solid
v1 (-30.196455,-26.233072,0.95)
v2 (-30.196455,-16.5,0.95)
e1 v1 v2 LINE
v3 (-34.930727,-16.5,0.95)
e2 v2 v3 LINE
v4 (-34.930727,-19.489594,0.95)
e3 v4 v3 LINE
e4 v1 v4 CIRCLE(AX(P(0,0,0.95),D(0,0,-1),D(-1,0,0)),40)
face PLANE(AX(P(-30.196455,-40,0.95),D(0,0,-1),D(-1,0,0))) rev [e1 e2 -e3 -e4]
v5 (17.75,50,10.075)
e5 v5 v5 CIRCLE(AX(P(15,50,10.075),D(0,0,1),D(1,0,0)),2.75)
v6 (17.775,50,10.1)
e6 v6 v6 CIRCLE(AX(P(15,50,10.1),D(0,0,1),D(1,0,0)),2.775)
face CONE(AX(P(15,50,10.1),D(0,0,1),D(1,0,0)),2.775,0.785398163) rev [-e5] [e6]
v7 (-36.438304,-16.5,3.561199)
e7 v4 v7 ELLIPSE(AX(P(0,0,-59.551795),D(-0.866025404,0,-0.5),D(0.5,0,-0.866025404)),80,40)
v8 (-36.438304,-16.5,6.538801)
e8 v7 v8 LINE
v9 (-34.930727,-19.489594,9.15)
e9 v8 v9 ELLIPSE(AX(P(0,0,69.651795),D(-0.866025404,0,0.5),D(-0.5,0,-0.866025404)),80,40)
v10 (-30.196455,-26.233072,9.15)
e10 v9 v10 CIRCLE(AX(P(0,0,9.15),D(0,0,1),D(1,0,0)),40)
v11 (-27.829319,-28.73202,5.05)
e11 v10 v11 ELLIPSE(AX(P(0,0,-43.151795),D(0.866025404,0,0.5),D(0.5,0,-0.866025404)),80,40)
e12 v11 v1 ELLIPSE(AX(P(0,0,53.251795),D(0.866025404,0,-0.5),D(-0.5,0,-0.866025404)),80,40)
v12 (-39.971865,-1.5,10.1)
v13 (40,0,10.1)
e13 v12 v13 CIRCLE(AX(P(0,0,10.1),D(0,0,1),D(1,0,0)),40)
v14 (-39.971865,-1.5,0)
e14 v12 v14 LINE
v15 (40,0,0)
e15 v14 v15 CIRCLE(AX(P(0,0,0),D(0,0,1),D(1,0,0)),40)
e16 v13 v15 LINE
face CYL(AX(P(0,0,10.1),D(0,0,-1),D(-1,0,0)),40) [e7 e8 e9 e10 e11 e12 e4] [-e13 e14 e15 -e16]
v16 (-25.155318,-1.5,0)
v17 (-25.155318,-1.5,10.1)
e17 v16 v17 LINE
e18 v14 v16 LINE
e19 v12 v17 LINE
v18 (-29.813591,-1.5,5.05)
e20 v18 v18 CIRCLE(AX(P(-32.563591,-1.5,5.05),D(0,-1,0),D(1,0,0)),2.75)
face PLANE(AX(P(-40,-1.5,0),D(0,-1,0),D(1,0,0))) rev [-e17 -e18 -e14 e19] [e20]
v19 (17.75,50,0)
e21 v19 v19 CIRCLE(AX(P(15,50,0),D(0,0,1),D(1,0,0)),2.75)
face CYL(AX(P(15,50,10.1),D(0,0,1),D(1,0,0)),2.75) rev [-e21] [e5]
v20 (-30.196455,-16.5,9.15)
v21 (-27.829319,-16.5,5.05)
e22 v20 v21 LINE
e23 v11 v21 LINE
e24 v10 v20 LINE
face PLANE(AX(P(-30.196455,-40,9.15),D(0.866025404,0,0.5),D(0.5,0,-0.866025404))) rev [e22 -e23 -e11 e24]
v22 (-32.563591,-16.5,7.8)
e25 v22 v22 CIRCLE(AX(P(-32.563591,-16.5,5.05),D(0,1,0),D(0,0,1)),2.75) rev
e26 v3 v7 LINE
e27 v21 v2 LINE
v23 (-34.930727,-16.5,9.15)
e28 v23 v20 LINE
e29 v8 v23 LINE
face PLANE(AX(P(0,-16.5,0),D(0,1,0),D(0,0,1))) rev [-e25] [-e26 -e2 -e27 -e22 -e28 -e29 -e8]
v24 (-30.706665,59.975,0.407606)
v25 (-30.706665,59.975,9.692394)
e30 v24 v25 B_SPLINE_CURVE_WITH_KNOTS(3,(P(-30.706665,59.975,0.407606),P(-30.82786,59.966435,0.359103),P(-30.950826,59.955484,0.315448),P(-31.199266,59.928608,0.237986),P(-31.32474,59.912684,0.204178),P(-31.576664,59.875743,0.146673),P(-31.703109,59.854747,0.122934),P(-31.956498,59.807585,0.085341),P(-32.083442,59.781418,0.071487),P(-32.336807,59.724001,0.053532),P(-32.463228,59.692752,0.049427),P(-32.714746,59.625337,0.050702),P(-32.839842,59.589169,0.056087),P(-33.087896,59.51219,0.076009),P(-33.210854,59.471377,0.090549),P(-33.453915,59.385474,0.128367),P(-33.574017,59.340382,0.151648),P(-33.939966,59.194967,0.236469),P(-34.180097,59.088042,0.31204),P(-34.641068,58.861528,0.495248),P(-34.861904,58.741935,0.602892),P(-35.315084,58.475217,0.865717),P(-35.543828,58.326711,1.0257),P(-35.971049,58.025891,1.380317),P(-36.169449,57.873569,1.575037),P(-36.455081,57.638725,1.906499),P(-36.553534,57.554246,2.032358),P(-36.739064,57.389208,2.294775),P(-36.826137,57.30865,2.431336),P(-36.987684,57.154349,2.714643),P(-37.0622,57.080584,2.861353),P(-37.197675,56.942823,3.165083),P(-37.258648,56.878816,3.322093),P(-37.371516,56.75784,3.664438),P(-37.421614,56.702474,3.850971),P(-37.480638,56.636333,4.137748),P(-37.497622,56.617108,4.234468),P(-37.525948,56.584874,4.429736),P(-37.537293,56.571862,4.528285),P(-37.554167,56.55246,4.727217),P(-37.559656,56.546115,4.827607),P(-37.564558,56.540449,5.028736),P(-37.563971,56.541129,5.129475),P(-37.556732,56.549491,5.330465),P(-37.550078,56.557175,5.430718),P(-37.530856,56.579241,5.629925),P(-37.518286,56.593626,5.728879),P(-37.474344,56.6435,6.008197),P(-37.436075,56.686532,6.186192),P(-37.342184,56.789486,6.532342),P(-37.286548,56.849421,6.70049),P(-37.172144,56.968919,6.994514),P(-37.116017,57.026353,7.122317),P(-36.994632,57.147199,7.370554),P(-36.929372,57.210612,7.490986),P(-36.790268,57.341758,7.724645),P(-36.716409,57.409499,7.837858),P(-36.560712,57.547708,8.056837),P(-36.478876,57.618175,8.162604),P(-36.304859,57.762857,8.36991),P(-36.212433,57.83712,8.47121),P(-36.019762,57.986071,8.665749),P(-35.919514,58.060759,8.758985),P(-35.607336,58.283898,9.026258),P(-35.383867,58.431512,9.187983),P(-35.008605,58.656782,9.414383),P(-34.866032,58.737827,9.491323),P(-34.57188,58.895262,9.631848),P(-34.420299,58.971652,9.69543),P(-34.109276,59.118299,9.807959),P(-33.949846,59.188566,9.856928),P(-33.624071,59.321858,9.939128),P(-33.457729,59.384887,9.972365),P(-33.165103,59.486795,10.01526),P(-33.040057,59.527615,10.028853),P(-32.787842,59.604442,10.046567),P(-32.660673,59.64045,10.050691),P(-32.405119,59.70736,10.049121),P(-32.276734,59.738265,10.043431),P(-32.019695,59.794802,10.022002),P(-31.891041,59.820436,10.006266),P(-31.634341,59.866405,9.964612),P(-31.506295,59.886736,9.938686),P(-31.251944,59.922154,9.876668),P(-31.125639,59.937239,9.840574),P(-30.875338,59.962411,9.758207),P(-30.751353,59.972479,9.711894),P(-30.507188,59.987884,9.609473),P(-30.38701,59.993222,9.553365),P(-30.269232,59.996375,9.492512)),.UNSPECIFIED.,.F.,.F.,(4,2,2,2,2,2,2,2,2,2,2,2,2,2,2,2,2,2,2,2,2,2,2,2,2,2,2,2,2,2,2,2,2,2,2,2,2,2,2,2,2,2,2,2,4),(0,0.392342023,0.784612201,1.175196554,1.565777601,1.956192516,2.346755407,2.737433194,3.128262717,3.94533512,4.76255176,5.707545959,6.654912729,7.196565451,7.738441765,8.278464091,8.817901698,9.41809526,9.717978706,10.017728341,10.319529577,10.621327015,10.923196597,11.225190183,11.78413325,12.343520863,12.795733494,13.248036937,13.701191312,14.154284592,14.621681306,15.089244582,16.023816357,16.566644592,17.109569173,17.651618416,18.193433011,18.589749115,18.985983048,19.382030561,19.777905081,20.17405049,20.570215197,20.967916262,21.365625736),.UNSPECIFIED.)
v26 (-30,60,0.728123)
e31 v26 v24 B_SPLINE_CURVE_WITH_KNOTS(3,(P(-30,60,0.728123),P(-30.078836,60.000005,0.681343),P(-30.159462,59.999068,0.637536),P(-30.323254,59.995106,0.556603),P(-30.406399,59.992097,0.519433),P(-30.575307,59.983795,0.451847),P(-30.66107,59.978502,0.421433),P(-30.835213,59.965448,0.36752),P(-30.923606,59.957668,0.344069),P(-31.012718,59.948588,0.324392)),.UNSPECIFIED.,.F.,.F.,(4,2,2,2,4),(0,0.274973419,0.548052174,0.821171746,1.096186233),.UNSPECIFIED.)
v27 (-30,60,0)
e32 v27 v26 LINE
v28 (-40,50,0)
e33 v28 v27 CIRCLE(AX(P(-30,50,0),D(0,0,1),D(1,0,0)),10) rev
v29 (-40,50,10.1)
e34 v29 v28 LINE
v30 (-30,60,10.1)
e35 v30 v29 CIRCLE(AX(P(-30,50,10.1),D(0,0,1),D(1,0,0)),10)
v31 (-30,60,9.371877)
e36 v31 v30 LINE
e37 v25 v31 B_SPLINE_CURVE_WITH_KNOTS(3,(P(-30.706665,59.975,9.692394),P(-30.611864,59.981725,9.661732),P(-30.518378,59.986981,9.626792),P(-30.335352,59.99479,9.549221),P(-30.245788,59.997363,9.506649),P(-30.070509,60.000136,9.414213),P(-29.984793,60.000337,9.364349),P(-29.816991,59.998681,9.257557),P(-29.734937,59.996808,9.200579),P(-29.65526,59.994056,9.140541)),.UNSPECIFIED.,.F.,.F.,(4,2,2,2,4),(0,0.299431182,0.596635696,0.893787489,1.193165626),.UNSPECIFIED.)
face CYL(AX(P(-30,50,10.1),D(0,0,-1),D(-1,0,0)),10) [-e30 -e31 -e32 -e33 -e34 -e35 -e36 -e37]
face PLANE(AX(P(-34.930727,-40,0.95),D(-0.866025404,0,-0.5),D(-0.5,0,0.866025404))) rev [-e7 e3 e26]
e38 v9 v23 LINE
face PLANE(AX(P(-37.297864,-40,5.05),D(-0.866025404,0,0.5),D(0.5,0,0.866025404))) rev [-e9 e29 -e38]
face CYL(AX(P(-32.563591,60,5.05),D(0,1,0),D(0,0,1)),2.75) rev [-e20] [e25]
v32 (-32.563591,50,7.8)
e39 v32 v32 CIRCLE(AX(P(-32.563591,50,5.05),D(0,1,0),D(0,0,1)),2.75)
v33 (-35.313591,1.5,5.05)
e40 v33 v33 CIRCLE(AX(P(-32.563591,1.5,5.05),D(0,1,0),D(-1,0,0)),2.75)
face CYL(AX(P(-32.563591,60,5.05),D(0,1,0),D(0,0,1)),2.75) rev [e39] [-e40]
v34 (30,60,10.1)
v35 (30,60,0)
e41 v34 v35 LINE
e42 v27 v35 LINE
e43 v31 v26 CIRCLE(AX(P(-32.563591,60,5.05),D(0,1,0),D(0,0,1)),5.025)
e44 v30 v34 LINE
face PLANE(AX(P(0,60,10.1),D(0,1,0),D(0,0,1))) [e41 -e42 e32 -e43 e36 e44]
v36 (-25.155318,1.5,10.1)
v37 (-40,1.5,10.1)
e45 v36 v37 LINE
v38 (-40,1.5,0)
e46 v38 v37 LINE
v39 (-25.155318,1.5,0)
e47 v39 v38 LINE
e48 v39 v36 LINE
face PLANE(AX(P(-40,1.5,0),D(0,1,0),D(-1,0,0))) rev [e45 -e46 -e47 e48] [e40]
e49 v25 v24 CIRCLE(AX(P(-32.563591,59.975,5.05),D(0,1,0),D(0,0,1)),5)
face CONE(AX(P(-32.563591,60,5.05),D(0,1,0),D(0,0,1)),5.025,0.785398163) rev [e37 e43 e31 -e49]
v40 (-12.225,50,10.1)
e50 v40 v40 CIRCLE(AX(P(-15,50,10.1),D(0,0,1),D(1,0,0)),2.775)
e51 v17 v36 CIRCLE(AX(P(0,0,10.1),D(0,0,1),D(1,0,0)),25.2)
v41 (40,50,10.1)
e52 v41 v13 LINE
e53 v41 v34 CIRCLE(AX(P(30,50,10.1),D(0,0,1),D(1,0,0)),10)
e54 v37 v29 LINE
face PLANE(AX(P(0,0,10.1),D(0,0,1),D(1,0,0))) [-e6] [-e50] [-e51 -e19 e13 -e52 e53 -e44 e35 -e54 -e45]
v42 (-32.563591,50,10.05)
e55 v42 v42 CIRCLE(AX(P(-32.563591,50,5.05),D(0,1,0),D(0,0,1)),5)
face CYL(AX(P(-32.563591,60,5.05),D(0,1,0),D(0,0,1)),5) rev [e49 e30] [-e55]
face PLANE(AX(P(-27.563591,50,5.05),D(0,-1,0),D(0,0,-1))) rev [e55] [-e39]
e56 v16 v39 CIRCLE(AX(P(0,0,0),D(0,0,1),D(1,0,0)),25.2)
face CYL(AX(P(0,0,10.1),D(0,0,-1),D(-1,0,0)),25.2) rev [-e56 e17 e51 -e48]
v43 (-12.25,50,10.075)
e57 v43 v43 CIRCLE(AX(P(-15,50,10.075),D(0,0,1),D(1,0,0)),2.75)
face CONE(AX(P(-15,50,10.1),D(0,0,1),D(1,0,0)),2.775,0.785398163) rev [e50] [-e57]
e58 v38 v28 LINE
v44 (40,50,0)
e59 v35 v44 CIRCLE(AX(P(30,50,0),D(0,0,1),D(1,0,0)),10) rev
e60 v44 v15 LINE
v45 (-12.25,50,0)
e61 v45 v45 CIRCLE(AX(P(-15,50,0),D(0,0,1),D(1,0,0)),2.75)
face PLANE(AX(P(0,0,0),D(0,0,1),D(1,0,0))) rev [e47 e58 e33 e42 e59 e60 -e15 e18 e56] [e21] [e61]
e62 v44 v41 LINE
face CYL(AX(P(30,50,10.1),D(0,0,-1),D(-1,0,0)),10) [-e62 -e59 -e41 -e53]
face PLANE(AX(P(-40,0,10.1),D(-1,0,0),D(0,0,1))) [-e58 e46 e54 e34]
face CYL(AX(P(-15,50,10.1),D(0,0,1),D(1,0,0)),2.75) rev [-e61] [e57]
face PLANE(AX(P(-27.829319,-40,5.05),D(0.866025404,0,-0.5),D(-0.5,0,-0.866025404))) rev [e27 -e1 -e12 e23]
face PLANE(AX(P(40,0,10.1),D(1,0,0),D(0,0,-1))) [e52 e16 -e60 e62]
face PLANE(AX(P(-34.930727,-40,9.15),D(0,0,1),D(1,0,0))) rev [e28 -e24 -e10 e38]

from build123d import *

# Parameters (mm, degrees)
BOSS_EXTRUDE1_DEPTH            = 10.1
SKETCH3_W                      = 14.844682471
SKETCH3_H                      = 3
CUT_EXTRUDE1_DEPTH             = 73.814902321
M5_CLEARANCE_HOLE1_D           = 5.5
M5_CLEARANCE_HOLE1_CSINK_D     = 5.55
M5_CLEARANCE_HOLE1_CSINK_ANGLE = 90
FILLET1_R                      = 10
CUT_EXTRUDE2_DEPTH             = 87.915246219


with BuildPart() as part:
    # Sketch2 → Boss-Extrude1 (new body)
    with BuildSketch(Plane.XY):
        with BuildLine():
            Line((-40, 60), (-40, 0))
            ThreePointArc((-40, 0), (0, 40), (40, 0))
            Line((40, 0), (40, 60))
            Line((40, 60), (-40, 60))
        make_face()
        with BuildLine():
            ThreePointArc((40, 0), (0, 40), (-40, 0))
            Line((-40, 0), (-25.2, 0))
            ThreePointArc((-25.2, 0), (0, 25.2), (25.2, 0))
            Line((25.2, 0), (40, 0))
        make_face()
        with BuildLine():
            Line((-25.2, 0), (-40, 0))
            ThreePointArc((-40, 0), (0, -40), (40, 0))
            Line((40, 0), (25.2, 0))
            ThreePointArc((25.2, 0), (0, -25.2), (-25.2, 0))
        make_face()
    extrude(amount=BOSS_EXTRUDE1_DEPTH)

    # Sketch3 → Cut-Extrude1 (cut, through all)
    with BuildSketch(Plane.XY.offset(10.1)):
        with Locations((-32.577658765, 0)):
            Rectangle(SKETCH3_W, SKETCH3_H)
    extrude(amount=-CUT_EXTRUDE1_DEPTH, mode=Mode.SUBTRACT)

    # Sketch10 → CBORE for M5 SHCS3 (revolve, cut)
    with BuildSketch(Plane(origin=(-32.563591317, 60, 5.05), x_dir=(0, 0, 1), z_dir=(1, 0, 0))):
        Polygon((0, 0), (0, 100), (2.75, 100), (2.75, 10), (5, 10), (5, 0.025), (5.025, 0), align=None)
    revolve(axis=Axis((-32.563591317, 66.35, 5.05), (0, -1, 0)), mode=Mode.SUBTRACT)

    # M5 Clearance Hole1 (through all)
    with Locations(Plane.XY.offset(10.1)):
        with Locations((-15, 50), (15, 50)):
            CounterSinkHole(M5_CLEARANCE_HOLE1_D / 2, M5_CLEARANCE_HOLE1_CSINK_D / 2, counter_sink_angle=M5_CLEARANCE_HOLE1_CSINK_ANGLE)

    # Fillet1
    # the kernel refuses this fillet: 10 mm, written as the material it takes off along each edge
    with BuildSketch(Plane(origin=(-40, 60, -25), x_dir=(0, -1, 0), z_dir=(0, 0, 1))) as fillet1_piece_1:
        with BuildLine():
            CenterArc((FILLET1_R, FILLET1_R), FILLET1_R, 180, 90)
            Line((0, FILLET1_R), (0, 0))
            Line((0, 0), (FILLET1_R, 0))
        make_face()
    extrude(amount=60.1, mode=Mode.SUBTRACT)
    with BuildSketch(Plane(origin=(40, 60, -25), x_dir=(0, -1, 0), z_dir=(0, 0, 1))) as fillet1_piece_2:
        with BuildLine():
            CenterArc((FILLET1_R, -FILLET1_R), FILLET1_R, 90, 90)
            Line((0, -FILLET1_R), (0, 0))
            Line((0, 0), (FILLET1_R, 0))
        make_face()
    extrude(amount=60.1, mode=Mode.SUBTRACT)

    # Sketch18 → Cut-Extrude2 (cut, through all)
    with BuildSketch(Plane(origin=(0, -16.5, 0), x_dir=(1, 0, 0), z_dir=(0, 1, 0))):
        Polygon((-27.82931911, -5.05), (-30.196455214, -0.95), (-34.930727421, -0.95), (-37.297863525, -5.05), (-34.930727421, -9.15), (-30.196455214, -9.15), align=None)
    extrude(amount=-CUT_EXTRUDE2_DEPTH, mode=Mode.SUBTRACT)


solid = part.part
